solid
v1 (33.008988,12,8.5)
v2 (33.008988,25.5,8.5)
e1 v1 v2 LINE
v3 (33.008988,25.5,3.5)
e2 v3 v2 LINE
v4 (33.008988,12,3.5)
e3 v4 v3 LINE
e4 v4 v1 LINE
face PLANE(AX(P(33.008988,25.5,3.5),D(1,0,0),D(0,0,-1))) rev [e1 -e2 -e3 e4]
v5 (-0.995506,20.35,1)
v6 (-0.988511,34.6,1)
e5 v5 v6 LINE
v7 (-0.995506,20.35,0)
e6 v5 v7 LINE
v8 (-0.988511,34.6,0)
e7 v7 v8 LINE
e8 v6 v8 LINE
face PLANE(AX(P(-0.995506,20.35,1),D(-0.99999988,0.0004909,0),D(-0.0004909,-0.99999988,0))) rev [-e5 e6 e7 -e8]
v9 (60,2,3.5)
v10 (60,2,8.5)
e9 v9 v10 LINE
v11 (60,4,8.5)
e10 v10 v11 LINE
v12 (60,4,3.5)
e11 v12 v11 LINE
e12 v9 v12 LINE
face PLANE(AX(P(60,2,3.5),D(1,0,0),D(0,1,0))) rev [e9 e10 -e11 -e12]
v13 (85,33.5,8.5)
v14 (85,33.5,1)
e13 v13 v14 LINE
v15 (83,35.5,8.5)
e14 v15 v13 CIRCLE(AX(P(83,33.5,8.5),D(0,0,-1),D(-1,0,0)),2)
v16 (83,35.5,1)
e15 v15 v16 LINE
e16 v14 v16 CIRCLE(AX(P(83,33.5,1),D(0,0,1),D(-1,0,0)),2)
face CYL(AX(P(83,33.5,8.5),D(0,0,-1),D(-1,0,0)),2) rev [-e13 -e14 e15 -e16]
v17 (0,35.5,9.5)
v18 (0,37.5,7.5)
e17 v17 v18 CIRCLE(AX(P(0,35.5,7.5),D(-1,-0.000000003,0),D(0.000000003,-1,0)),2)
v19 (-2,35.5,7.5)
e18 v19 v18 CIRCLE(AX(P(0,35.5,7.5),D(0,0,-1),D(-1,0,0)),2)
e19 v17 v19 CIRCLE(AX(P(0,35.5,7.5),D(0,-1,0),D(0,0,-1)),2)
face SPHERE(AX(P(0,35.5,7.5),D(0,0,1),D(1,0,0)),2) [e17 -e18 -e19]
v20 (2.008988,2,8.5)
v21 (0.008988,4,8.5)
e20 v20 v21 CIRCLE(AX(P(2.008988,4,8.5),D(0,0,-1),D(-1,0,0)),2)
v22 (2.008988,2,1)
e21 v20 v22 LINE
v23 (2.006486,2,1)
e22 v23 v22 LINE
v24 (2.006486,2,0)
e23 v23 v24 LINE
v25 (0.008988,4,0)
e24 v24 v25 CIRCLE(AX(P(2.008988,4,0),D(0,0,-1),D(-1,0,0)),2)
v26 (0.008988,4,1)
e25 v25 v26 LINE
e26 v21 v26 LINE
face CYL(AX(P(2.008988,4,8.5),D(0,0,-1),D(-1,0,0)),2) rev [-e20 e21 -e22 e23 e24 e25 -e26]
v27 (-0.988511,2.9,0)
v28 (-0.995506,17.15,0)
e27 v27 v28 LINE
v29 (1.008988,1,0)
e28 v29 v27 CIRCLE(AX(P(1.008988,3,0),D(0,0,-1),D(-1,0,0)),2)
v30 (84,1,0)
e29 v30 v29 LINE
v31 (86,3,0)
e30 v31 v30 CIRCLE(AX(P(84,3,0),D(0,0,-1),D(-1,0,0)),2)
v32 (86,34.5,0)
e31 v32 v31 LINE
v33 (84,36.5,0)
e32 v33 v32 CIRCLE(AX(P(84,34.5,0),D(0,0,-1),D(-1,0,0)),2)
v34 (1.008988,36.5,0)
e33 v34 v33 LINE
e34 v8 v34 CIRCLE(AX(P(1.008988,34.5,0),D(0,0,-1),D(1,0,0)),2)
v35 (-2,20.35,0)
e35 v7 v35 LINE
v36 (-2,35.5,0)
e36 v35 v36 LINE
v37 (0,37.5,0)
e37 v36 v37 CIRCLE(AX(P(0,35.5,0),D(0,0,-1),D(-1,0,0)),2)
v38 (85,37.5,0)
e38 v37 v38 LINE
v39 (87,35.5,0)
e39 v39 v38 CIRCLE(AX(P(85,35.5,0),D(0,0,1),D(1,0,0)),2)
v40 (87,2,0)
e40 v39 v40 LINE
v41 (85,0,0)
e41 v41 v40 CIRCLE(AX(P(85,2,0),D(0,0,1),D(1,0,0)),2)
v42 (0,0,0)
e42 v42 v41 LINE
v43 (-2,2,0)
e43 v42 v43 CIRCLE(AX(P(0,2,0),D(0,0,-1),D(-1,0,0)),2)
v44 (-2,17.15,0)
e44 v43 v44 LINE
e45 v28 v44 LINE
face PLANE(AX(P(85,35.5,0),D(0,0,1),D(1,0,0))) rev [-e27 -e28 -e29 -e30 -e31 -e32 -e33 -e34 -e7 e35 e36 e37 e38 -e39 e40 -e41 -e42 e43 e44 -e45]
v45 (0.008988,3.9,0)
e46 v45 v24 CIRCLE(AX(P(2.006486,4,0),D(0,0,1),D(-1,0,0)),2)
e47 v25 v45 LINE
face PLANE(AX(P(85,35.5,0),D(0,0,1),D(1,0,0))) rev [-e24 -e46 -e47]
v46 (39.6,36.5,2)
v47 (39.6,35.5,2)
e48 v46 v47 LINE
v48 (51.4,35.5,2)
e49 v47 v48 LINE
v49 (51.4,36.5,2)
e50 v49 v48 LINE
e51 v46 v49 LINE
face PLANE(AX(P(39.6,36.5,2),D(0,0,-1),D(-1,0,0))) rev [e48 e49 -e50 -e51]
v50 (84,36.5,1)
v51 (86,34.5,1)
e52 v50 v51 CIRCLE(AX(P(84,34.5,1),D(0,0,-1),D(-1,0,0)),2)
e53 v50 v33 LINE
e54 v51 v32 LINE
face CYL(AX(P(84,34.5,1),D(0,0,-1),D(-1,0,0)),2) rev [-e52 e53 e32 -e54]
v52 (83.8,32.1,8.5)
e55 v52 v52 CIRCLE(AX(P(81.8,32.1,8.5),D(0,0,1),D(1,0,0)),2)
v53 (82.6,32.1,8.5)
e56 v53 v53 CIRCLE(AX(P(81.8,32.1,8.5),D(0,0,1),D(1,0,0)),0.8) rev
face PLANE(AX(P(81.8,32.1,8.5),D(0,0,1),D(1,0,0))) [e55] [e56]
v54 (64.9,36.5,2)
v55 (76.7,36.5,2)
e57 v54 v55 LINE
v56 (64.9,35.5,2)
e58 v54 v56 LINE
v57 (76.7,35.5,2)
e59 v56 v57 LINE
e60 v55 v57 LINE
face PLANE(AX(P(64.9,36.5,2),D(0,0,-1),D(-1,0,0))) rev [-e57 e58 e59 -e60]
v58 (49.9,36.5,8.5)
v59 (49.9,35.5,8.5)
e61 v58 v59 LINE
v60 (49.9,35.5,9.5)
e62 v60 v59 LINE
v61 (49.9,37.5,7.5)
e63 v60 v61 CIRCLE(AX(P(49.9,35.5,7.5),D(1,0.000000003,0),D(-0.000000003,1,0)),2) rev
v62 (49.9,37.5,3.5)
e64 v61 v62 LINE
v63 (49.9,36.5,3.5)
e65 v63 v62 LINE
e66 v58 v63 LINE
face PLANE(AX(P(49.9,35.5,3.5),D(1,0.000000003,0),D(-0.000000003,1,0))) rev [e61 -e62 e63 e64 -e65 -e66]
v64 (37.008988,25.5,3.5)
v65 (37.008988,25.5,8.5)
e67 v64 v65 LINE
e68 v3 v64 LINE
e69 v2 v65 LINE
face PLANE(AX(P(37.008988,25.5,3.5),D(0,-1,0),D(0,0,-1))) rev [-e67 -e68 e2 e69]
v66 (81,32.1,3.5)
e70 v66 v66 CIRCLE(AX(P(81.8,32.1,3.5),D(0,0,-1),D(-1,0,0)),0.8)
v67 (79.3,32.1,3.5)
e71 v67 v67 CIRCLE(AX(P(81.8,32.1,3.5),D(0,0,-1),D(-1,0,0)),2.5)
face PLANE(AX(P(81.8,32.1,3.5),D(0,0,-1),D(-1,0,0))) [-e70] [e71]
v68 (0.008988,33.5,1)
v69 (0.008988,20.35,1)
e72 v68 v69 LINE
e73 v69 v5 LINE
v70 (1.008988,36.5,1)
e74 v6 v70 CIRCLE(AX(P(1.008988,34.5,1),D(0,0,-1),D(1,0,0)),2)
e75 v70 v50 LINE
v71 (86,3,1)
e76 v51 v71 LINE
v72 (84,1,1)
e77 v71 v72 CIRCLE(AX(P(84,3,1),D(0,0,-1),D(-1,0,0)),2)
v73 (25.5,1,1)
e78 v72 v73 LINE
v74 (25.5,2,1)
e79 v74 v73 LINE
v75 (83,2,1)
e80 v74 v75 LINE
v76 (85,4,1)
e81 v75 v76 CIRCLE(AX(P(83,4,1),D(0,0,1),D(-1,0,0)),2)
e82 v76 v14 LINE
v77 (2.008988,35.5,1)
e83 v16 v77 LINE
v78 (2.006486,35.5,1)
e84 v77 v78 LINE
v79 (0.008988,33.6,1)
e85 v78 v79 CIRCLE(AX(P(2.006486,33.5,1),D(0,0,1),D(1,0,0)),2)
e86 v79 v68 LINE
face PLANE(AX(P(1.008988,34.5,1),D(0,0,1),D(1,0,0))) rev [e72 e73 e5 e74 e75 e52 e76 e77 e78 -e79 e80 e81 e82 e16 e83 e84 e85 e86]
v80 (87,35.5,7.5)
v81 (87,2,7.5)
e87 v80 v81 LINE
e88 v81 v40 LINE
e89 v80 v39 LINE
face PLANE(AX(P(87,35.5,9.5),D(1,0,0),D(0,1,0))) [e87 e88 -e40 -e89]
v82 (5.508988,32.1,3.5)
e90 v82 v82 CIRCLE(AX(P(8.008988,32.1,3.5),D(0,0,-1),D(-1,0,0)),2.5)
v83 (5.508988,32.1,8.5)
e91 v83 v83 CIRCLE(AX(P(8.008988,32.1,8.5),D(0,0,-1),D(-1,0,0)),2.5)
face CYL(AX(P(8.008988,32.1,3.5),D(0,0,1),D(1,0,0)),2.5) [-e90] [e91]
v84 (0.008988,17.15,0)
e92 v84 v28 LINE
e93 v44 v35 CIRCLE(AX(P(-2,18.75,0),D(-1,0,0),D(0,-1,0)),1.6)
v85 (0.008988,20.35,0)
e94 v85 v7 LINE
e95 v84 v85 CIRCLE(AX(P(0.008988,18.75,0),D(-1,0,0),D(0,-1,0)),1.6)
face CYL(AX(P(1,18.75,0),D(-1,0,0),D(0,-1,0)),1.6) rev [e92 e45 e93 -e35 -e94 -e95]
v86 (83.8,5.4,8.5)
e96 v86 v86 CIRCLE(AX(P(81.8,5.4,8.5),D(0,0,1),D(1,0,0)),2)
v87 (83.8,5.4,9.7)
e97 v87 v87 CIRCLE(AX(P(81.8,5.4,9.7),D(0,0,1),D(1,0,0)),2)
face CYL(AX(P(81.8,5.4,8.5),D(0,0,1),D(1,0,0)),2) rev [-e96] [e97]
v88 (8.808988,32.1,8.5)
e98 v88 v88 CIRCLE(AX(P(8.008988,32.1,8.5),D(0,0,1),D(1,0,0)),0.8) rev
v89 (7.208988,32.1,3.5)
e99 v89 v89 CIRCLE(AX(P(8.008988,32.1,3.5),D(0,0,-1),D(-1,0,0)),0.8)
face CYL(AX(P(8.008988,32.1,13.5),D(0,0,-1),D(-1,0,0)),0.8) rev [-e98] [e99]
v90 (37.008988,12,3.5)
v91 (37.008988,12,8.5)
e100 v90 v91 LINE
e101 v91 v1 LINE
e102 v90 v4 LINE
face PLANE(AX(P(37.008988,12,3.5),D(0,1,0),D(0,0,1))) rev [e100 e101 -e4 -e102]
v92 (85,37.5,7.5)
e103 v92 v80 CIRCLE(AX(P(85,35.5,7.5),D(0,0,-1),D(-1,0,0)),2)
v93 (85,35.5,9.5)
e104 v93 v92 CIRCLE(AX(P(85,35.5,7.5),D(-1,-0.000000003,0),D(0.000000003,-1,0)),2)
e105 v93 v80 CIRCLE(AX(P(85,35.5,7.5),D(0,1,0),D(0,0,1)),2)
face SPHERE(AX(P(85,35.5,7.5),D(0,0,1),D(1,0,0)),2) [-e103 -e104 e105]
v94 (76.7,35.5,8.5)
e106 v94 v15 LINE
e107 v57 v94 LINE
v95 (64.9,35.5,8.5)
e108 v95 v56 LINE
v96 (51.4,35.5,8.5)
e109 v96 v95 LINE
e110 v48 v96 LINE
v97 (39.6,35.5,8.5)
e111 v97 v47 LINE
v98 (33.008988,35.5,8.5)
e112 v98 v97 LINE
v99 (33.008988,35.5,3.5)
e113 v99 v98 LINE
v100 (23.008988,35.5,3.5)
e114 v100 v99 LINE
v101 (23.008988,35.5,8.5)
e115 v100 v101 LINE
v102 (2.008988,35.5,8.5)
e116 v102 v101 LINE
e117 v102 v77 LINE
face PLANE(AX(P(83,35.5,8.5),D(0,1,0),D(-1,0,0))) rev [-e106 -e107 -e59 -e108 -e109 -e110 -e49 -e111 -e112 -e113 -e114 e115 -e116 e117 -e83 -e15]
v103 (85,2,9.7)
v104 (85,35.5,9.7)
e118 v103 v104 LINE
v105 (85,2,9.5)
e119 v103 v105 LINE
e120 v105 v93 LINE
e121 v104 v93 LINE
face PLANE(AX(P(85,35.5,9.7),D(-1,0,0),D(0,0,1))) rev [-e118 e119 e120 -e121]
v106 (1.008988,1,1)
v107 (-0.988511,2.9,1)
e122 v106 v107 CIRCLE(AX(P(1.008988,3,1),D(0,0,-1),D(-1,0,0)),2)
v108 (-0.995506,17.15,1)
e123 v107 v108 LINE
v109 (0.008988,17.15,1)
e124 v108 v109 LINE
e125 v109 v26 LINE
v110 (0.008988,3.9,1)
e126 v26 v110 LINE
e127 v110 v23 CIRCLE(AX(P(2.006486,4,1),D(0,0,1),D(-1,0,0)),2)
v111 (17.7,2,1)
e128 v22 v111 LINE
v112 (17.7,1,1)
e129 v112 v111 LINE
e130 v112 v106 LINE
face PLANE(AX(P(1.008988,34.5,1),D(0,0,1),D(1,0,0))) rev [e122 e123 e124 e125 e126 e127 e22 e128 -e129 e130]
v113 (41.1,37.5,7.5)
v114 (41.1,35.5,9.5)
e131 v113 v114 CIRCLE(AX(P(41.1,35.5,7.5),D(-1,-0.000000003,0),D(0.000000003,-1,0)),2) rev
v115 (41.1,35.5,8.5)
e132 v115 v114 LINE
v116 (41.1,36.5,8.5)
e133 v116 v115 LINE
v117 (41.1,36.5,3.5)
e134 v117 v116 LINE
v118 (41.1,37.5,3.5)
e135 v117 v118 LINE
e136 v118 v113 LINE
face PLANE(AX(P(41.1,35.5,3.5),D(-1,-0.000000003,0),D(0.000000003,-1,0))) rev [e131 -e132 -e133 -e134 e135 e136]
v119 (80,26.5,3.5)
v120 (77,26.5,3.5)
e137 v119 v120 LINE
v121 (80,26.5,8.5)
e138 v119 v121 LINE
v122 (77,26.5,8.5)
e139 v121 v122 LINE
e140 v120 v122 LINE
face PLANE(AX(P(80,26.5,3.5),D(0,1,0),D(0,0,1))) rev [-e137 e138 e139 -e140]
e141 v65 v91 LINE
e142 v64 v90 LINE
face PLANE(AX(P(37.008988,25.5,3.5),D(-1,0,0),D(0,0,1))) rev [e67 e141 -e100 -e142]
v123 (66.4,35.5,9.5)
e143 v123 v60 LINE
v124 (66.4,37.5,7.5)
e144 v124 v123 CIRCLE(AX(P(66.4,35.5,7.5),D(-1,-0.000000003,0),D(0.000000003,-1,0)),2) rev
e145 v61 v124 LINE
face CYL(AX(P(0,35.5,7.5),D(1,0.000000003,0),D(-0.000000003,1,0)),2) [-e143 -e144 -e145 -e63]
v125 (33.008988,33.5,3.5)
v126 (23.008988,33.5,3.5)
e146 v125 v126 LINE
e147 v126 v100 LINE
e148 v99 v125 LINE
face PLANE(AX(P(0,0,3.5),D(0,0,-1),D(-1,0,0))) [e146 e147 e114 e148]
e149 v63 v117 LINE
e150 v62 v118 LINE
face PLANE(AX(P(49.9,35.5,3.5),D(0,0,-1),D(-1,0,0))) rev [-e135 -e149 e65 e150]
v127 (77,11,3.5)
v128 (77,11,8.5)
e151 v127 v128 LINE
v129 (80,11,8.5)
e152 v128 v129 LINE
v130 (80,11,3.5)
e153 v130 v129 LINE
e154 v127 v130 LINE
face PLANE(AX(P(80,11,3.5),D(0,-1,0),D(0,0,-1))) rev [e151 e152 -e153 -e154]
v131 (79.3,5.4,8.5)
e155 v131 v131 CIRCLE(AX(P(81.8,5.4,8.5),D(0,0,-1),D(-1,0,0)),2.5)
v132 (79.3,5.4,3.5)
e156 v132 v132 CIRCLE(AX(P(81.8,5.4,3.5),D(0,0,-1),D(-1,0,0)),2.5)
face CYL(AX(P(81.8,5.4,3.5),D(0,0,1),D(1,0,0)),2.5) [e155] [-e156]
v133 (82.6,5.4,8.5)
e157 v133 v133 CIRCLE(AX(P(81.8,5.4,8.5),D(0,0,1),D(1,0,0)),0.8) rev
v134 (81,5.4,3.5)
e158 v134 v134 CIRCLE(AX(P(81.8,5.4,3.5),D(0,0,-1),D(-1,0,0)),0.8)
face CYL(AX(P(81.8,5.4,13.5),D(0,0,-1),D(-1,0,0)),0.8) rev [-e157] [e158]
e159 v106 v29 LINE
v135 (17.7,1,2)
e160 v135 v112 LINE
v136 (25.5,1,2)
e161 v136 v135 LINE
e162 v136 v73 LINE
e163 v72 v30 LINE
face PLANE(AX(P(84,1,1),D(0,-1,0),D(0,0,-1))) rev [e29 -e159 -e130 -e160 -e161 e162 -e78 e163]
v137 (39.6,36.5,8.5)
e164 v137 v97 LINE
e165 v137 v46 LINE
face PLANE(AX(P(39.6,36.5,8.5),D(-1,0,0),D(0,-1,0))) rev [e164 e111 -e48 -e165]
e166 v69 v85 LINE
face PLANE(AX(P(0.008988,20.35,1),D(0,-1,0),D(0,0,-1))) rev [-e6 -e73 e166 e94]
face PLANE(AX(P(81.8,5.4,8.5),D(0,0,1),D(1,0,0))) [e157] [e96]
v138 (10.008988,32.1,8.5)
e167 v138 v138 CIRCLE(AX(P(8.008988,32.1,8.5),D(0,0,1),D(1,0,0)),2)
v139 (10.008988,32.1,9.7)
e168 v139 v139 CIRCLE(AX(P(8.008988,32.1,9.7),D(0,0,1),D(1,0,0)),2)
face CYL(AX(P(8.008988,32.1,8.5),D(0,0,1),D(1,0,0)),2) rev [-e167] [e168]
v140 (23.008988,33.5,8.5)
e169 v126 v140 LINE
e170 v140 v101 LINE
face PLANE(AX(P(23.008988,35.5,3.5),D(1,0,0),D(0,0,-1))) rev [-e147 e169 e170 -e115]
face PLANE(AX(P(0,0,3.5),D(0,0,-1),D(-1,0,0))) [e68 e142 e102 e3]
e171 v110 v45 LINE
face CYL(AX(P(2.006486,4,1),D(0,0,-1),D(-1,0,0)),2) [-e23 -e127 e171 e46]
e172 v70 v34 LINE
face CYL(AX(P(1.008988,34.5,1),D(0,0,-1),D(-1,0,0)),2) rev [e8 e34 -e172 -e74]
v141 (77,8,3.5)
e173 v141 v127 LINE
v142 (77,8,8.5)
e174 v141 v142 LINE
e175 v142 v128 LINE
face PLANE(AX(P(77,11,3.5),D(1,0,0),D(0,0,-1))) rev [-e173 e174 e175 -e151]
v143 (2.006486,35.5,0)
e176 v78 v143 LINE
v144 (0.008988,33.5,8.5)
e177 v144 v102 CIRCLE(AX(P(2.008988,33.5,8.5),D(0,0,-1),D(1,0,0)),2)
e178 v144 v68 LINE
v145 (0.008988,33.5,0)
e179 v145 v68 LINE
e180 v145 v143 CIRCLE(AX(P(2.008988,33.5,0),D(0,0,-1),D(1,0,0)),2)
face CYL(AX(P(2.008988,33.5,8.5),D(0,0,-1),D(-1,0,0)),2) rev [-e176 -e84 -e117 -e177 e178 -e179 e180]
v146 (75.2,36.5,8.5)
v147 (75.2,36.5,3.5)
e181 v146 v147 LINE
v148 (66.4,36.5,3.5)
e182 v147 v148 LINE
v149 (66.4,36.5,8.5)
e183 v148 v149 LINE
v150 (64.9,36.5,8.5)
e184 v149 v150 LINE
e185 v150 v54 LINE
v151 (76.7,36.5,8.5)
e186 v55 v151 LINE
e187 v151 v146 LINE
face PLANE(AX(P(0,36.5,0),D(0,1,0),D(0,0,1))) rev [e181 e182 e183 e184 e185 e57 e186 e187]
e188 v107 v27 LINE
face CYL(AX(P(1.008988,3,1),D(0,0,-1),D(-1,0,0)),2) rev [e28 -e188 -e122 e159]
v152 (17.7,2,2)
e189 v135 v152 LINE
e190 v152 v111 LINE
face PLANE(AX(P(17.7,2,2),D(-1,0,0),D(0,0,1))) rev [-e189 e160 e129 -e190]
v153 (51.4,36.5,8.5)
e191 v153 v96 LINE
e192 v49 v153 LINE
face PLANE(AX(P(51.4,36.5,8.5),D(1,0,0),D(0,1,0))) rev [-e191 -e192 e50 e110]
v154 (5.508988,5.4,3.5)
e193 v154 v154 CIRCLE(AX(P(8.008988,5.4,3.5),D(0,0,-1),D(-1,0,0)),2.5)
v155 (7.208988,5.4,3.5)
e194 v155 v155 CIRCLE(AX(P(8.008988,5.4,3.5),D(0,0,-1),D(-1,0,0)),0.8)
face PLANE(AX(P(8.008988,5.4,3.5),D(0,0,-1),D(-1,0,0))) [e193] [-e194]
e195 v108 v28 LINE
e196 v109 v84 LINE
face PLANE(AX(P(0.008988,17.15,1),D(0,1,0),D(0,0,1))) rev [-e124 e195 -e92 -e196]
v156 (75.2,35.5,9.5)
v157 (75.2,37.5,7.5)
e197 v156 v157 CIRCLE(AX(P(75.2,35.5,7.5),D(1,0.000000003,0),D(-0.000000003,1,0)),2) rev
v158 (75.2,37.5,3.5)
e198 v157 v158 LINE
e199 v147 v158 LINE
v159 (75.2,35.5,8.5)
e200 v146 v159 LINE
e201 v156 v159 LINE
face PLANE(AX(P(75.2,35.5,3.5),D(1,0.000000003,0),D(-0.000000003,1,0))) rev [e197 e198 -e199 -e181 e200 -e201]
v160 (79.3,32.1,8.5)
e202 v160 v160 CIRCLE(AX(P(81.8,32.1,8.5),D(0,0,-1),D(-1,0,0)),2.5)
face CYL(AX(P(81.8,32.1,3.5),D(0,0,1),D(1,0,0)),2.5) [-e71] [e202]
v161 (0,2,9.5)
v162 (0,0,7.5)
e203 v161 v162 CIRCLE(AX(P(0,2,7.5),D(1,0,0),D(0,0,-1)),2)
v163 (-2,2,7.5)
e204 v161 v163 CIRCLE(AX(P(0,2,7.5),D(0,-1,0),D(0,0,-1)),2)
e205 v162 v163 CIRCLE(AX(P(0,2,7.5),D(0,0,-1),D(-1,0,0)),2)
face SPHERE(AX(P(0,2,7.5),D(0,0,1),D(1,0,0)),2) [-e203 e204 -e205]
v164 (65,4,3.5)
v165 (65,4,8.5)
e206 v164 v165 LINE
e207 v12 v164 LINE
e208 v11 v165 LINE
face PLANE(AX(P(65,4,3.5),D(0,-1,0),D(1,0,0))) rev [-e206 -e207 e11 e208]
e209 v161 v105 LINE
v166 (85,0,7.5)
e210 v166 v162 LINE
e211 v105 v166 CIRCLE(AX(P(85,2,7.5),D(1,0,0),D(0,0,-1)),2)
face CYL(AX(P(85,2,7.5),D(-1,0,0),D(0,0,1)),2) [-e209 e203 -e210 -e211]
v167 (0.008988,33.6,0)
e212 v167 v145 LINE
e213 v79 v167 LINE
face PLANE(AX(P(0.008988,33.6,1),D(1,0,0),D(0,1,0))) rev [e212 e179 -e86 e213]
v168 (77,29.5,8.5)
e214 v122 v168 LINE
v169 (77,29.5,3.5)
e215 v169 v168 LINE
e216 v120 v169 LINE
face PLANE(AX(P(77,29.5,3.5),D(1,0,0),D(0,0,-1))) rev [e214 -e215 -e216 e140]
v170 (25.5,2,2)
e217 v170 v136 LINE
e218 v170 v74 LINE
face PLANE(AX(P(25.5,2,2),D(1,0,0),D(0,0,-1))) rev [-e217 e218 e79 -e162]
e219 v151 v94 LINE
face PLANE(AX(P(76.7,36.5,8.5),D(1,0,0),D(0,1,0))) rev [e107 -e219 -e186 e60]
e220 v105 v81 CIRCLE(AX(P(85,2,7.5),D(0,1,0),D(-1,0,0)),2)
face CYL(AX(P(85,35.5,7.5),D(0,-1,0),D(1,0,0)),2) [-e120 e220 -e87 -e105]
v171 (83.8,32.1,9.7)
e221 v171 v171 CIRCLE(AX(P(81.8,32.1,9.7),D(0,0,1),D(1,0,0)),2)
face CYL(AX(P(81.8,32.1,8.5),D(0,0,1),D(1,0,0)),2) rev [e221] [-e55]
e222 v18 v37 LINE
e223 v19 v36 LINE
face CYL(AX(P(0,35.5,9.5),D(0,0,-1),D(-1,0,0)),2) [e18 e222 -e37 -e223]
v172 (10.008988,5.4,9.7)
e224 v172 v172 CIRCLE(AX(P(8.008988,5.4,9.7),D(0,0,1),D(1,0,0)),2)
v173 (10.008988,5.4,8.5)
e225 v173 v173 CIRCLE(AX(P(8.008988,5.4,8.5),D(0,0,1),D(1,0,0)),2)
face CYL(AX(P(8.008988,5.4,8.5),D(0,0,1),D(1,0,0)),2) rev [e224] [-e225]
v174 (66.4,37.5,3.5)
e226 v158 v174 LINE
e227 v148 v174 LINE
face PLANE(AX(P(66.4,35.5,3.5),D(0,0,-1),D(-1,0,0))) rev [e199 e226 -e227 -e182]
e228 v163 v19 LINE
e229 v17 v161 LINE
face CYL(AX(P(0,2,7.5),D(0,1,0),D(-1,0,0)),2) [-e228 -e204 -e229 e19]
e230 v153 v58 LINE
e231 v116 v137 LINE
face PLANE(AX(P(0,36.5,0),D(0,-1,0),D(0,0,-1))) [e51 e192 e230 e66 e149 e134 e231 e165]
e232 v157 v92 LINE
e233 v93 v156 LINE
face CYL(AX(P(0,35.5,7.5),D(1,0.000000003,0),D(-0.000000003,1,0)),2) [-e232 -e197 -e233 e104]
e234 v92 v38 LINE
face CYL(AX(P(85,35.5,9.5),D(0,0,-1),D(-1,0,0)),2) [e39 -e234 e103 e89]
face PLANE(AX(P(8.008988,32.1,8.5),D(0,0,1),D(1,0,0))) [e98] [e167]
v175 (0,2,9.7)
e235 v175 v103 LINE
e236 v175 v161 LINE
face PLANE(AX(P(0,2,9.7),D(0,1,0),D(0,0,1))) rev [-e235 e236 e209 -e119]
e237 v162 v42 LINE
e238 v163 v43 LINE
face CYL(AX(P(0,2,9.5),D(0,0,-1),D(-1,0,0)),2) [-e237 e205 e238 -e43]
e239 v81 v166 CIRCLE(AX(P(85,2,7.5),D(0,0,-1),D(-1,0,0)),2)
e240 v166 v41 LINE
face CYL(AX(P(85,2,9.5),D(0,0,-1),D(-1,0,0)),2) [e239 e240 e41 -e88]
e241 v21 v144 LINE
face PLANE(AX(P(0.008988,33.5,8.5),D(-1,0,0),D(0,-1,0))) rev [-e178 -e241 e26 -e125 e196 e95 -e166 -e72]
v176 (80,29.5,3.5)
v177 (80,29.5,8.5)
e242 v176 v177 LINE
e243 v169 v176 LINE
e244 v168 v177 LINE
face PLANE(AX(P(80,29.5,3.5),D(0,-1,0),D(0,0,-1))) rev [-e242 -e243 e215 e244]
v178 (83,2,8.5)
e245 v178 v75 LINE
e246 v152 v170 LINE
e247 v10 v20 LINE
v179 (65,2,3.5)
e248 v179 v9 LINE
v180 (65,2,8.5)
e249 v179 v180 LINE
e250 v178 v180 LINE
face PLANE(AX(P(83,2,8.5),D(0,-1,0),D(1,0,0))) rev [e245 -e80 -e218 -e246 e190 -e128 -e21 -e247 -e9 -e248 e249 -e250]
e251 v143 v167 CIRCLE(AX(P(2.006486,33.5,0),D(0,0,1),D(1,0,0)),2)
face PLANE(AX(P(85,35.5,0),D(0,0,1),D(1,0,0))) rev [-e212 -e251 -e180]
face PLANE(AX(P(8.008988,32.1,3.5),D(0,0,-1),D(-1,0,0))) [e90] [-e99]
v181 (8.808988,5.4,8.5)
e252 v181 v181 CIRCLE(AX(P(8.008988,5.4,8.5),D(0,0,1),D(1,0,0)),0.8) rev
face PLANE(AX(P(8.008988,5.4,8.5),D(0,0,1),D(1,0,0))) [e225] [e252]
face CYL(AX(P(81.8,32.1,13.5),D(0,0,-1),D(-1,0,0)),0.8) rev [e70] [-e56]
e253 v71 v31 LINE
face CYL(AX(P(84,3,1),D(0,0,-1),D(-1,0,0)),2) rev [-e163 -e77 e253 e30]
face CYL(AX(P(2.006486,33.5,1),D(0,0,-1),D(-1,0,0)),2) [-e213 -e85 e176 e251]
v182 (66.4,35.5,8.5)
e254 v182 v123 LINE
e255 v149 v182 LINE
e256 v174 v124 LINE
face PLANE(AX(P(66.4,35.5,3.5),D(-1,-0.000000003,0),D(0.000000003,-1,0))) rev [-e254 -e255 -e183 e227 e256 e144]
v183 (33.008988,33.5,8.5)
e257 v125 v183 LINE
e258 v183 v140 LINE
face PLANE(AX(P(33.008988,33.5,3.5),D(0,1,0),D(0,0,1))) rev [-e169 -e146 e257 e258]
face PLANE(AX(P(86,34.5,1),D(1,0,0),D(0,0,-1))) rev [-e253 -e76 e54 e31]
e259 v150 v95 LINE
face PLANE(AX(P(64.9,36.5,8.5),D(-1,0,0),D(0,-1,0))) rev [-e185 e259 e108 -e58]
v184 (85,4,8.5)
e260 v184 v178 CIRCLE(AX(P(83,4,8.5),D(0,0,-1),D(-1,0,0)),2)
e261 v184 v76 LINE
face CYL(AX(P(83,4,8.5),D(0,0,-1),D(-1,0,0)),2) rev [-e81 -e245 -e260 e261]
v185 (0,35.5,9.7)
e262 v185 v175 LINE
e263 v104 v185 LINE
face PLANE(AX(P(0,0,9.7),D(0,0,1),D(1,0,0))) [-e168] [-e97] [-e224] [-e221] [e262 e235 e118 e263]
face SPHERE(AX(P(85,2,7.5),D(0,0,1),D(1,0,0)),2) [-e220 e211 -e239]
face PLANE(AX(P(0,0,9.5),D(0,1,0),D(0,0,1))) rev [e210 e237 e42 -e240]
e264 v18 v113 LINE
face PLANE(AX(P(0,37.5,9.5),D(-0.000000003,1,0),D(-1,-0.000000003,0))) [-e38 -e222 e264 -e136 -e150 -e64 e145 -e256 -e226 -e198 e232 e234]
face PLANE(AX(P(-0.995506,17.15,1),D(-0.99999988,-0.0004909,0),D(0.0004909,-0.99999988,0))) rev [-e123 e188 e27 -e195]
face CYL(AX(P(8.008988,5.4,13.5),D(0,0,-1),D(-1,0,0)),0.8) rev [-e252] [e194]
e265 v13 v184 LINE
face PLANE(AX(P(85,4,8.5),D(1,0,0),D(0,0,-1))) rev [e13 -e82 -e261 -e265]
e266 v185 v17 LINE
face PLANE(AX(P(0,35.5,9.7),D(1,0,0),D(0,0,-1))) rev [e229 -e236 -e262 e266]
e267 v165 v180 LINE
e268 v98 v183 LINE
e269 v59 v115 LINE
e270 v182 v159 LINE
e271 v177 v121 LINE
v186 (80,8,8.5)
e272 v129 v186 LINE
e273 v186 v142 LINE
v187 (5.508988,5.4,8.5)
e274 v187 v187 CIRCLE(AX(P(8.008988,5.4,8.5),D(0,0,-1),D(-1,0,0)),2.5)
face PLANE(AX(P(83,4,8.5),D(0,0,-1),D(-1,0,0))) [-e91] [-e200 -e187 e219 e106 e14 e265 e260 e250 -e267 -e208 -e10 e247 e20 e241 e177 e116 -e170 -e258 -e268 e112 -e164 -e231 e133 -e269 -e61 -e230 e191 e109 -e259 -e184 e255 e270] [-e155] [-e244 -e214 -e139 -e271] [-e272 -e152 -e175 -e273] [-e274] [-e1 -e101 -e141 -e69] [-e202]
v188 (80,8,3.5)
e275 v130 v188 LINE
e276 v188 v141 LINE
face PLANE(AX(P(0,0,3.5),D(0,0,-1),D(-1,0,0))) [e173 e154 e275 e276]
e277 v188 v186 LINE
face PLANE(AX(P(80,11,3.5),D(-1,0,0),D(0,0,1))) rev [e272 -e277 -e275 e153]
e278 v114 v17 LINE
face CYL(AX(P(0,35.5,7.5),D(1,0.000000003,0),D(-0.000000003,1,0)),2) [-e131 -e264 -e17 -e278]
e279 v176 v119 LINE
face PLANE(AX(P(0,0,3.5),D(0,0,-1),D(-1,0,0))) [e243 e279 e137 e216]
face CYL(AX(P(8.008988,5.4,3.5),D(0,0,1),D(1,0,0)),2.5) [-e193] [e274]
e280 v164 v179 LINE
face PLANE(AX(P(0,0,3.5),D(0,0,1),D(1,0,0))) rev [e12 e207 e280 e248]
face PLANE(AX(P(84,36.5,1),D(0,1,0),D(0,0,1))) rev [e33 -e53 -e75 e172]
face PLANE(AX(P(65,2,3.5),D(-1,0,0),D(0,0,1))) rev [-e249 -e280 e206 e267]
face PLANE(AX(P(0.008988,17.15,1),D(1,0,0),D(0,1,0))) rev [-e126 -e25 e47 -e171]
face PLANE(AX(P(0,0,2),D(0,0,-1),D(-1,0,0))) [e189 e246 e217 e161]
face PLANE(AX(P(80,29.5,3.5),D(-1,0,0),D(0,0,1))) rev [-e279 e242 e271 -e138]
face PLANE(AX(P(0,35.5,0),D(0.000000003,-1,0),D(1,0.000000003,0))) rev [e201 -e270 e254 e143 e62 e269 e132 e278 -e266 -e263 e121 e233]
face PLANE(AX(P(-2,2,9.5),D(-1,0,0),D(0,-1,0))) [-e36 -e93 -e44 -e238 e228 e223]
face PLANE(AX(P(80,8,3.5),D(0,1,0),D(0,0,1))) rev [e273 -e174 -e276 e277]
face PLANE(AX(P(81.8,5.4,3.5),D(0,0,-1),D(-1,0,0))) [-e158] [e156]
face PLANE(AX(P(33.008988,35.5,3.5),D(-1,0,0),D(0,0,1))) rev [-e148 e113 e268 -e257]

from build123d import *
from OCP.BRepAlgoAPI import BRepAlgoAPI_Cut
from OCP.TopTools import TopTools_ListOfShape

# Parameters (mm, degrees)
EXTRUDE_1_DEPTH      = 9.5
CUT_EXTRUDE_1_DEPTH  = 8.5
SKETCH_4_R           = 2.5
SKETCH_4_W           = 10
SKETCH_4_H           = 2
SKETCH_4_W_2         = 5
EXTRUDE_2_DEPTH      = 5
SKETCH_10_W          = 8.8
SKETCH_10_H          = 6
CUT_EXTRUDE_3_DEPTH  = 2
CUT_EXTRUDE_4_DEPTH  = 3
FILLET_4_R           = 2
FILLET_5_R           = 2
SKETCH_5_R           = 0.8
CUT_EXTRUDE_5_DEPTH  = 10
SKETCH_7_R           = 0.8
CUT_EXTRUDE_6_DEPTH  = 10
SKETCH_6_R           = 0.8
CUT_EXTRUDE_7_DEPTH  = 10
SKETCH_8_R           = 0.8
CUT_EXTRUDE_8_DEPTH  = 10
SKETCH_12_R          = 2
CUT_EXTRUDE_9_DEPTH  = 1
SKETCH_14_W          = 1.5
SKETCH_14_H          = 5
CUT_EXTRUDE_11_DEPTH = 1
SKETCH_15_W          = 1.5
SKETCH_15_H          = 5
CUT_EXTRUDE_12_DEPTH = 1
SKETCH_16_W          = 1.5
SKETCH_16_H          = 5
CUT_EXTRUDE_13_DEPTH = 1
SKETCH_18_W          = 3
SKETCH_18_H          = 3
SKETCH_18_W_2        = 4
SKETCH_18_H_2        = 13.499999703
EXTRUDE_3_DEPTH      = 5
SKETCH_20_W          = 11.8
SKETCH_20_H          = 1.5
CUT_EXTRUDE_16_DEPTH = 1
EXTRUDE_START        = 0.2
SKETCH_21_W          = 85
SKETCH_21_H          = 33.499999703
SKETCH_21_R          = 2
EXTRUDE_4_DEPTH      = 0.2
CUT_EXTRUDE_17_DEPTH = 1
SKETCH_22_W          = 7.8
SKETCH_22_H          = 1
CUT_EXTRUDE_18_DEPTH = 1


with BuildPart() as part:
    # 草图2 → 凸台-拉伸1 (new body)
    with BuildSketch(Plane.XY):
        with BuildLine():
            Line((0, 0), (85, 0))
            ThreePointArc((85, 0), (86.414213562, 0.585786438), (87, 2))
            Line((87, 2), (87, 35.5))
            ThreePointArc((87, 35.5), (86.41421356, 36.914213565), (84.999999993, 37.5))
            Line((84.999999993, 37.5), (-7e-09, 37.499999703))
            ThreePointArc((-7e-09, 37.499999703), (-1.414213565, 36.914213263), (-2, 35.499999703))
            Line((-2, 35.499999703), (-2, 1.999999703))
            ThreePointArc((-2, 1.999999703), (-1.414213353, 0.585786351), (0, 0))
        make_face()
    extrude(amount=EXTRUDE_1_DEPTH)

    # 草图3 → 切除-拉伸1 (cut)
    with BuildSketch(Plane(origin=(0, 0, 0), x_dir=(-1, 0, 0), z_dir=(0, 0, -1))):
        with BuildLine():
            Line((-83, 2), (-2.008987521, 2))
            ThreePointArc((-2.008987521, 2), (-0.594773959, 2.585786438), (-0.008987521, 4))
            Line((-0.008987521, 4), (-0.008987521, 33.499999703))
            ThreePointArc((-0.008987521, 33.499999703), (-0.594773959, 34.914213266), (-2.008987521, 35.499999703))
            Line((-2.008987521, 35.499999703), (-83, 35.499999703))
            ThreePointArc((-83, 35.499999703), (-84.414213562, 34.914213266), (-85, 33.499999703))
            Line((-85, 33.499999703), (-85, 4))
            ThreePointArc((-85, 4), (-84.414213562, 2.585786438), (-83, 2))
        make_face()
    extrude(amount=-CUT_EXTRUDE_1_DEPTH, mode=Mode.SUBTRACT)

    # 草图4 → 凸台-拉伸2 (add)
    with BuildSketch(Plane(origin=(0, 0, 8.5), x_dir=(-1, 0, 0), z_dir=(0, 0, -1))):
        with Locations((-81.8, 32.099999703)):
            Circle(SKETCH_4_R)
        with Locations((-8.008987521, 32.099999703)):
            Circle(SKETCH_4_R)
        with Locations((-8.008987521, 5.4)):
            Circle(SKETCH_4_R)
        with Locations((-81.8, 5.4)):
            Circle(SKETCH_4_R)
        with Locations((-28.008987521, 34.499999703)):
            Rectangle(SKETCH_4_W, SKETCH_4_H)
        with Locations((-62.5, 3)):
            Rectangle(SKETCH_4_W_2, SKETCH_4_H)
    extrude(amount=EXTRUDE_2_DEPTH)

    # 草图10 → 切除-拉伸3 (cut)
    with BuildSketch(Plane(origin=(-1.31e-07, 37.499999703, 0), x_dir=(1.0, 3.4902577560140295e-09, 0), z_dir=(-3.4902577560140295e-09, 1.0, 0))):
        with Locations((45.500000124, -6.5)):
            Rectangle(SKETCH_10_W, SKETCH_10_H)
        with Locations((70.800000124, -6.5)):
            Rectangle(SKETCH_10_W, SKETCH_10_H)
    extrude(amount=-CUT_EXTRUDE_3_DEPTH, mode=Mode.SUBTRACT)

    # 草图11 → 切除-拉伸4 (cut)
    with BuildSketch(Plane.ZY.offset(2)):
        with BuildLine():
            Line((0, 20.349999703), (0, 17.149999703))
            ThreePointArc((0, 17.149999703), (1.6, 18.749999703), (0, 20.349999703))
        make_face()
    extrude(amount=-CUT_EXTRUDE_4_DEPTH, mode=Mode.SUBTRACT)

    # 圆角4
    fillet_4_edges = [part.edges().sort_by_distance(p)[0] for p in [
        (80.099999993, 37.499999983, 9.5),
        (86.41421356, 36.914213565, 9.5),
        (87, 18.75, 9.5),
        (86.414213562, 0.585786438, 9.5),
        (42.5, 0, 9.5),
        (-1.414213396, 0.585786394, 9.5),
        (-2, 18.749999703, 9.5),
        (-1.414213565, 36.914213263, 9.5),
        (20.549999993, 37.499999775, 9.5),
    ]]
    fillet(fillet_4_edges, radius=FILLET_4_R - 0.0001)  # a hair under: the kernel refuses the full size

    # 圆角5
    fillet_5_edges = [part.edges().sort_by_distance(p)[0] for p in [
        (58.149999993, 37.499999906, 9.5),
    ]]
    fillet(fillet_5_edges, radius=FILLET_5_R)

    # 草图5 → 切除-拉伸5 (cut)
    with BuildSketch(Plane(origin=(0, 0, 3.5), x_dir=(-1, 0, 0), z_dir=(0, 0, -1))):
        with Locations((-81.8, 32.099999703)):
            Circle(SKETCH_5_R)
    extrude(amount=-CUT_EXTRUDE_5_DEPTH, mode=Mode.SUBTRACT)

    # 草图7 → 切除-拉伸6 (cut)
    with BuildSketch(Plane(origin=(0, 0, 3.5), x_dir=(-1, 0, 0), z_dir=(0, 0, -1))):
        with Locations((-8.008987521, 5.4)):
            Circle(SKETCH_7_R)
    extrude(amount=-CUT_EXTRUDE_6_DEPTH, mode=Mode.SUBTRACT)

    # 草图6 → 切除-拉伸7 (cut)
    with BuildSketch(Plane(origin=(0, 0, 3.5), x_dir=(-1, 0, 0), z_dir=(0, 0, -1))):
        with Locations((-8.008987521, 32.099999703)):
            Circle(SKETCH_6_R)
    extrude(amount=-CUT_EXTRUDE_7_DEPTH, mode=Mode.SUBTRACT)

    # 草图8 → 切除-拉伸8 (cut)
    with BuildSketch(Plane(origin=(0, 0, 3.5), x_dir=(-1, 0, 0), z_dir=(0, 0, -1))):
        with Locations((-81.8, 5.4)):
            Circle(SKETCH_8_R)
    extrude(amount=-CUT_EXTRUDE_8_DEPTH, mode=Mode.SUBTRACT)

    # 草图12 → 切除-拉伸9 (cut)
    with BuildSketch(Plane.XY.offset(9.5)):
        with Locations((8.008987521, 32.099999703)):
            Circle(SKETCH_12_R)
        with Locations((81.8, 32.099999703)):
            Circle(SKETCH_12_R)
        with Locations((81.8, 5.4)):
            Circle(SKETCH_12_R)
        with Locations((8.008987521, 5.4)):
            Circle(SKETCH_12_R)
    extrude(amount=-CUT_EXTRUDE_9_DEPTH, mode=Mode.SUBTRACT)

    # 草图14 → 切除-拉伸11 (cut)
    with BuildSketch(Plane.XZ.offset(-35.499999703)):
        with Locations((50.65, 6)):
            Rectangle(SKETCH_14_W, SKETCH_14_H)
        with Locations((65.65, 6)):
            Rectangle(SKETCH_14_W, SKETCH_14_H)
    extrude(amount=-CUT_EXTRUDE_11_DEPTH, mode=Mode.SUBTRACT)

    # 草图15 → 切除-拉伸12 (cut)
    with BuildSketch(Plane.XZ.offset(-35.499999703)):
        with Locations((75.95, 6)):
            Rectangle(SKETCH_15_W, SKETCH_15_H)
    extrude(amount=-CUT_EXTRUDE_12_DEPTH, mode=Mode.SUBTRACT)

    # 草图16 → 切除-拉伸13 (cut)
    with BuildSketch(Plane.XZ.offset(-35.499999703)):
        with Locations((40.35, 6)):
            Rectangle(SKETCH_16_W, SKETCH_16_H)
    extrude(amount=-CUT_EXTRUDE_13_DEPTH, mode=Mode.SUBTRACT)

    # 草图18 → 凸台-拉伸3 (add)
    with BuildSketch(Plane(origin=(0, 0, 8.5), x_dir=(-1, 0, 0), z_dir=(0, 0, -1))):
        with Locations((-78.5, 9.5)):
            Rectangle(SKETCH_18_W, SKETCH_18_H)
        with Locations((-78.5, 27.999999703)):
            Rectangle(SKETCH_18_W, SKETCH_18_H)
        with Locations((-35.008987521, 18.749999852)):
            Rectangle(SKETCH_18_W_2, SKETCH_18_H_2)
    extrude(amount=EXTRUDE_3_DEPTH)

    # 草图20 → 切除-拉伸16 (cut)
    with BuildSketch(Plane.XZ.offset(-35.499999703)):
        with Locations((45.5, 2.75)):
            Rectangle(SKETCH_20_W, SKETCH_20_H)
        with Locations((70.8, 2.75)):
            Rectangle(SKETCH_20_W, SKETCH_20_H)
    extrude(amount=-CUT_EXTRUDE_16_DEPTH, mode=Mode.SUBTRACT)

    # 草图21 → 凸台-拉伸4 (add)
    with BuildSketch(Plane.XY.offset(9.5).offset(EXTRUDE_START)):
        with Locations((42.5, 18.749999852)):
            Rectangle(SKETCH_21_W, SKETCH_21_H)
        with Locations((8.008987521, 32.099999703)):
            Circle(SKETCH_21_R, mode=Mode.SUBTRACT)
        with Locations((8.008987521, 5.4)):
            Circle(SKETCH_21_R, mode=Mode.SUBTRACT)
        with Locations((81.8, 32.099999703)):
            Circle(SKETCH_21_R, mode=Mode.SUBTRACT)
        with Locations((81.8, 5.4)):
            Circle(SKETCH_21_R, mode=Mode.SUBTRACT)
    extrude(amount=-EXTRUDE_4_DEPTH)


with BuildPart() as cut_extrude_17_tool:
    # 草图19 → 切除-拉伸17 (new body)
    with BuildSketch(Plane(origin=(0, 0, 0), x_dir=(-1, 0, 0), z_dir=(0, 0, -1))):
        with BuildLine():
            Line((-84, 36.499999703), (-1.008987521, 36.499999703))
            ThreePointArc((-1.008987521, 36.499999703), (0.369417354, 35.949137378), (0.988510914, 34.599999703))
            Line((0.988510914, 34.599999703), (0.995506239, 20.349999703))
            Line((0.995506239, 20.349999703), (-0.008987521, 20.349999703))
            Line((-0.008987521, 20.349999703), (-0.008987521, 33.599999703))
            ThreePointArc((-0.008987521, 33.599999703), (-0.628081081, 34.949137378), (-2.006485957, 35.499999703))
            Line((-2.006485957, 35.499999703), (-83, 35.499999703))
            ThreePointArc((-83, 35.499999703), (-84.414213562, 34.914213266), (-85, 33.499999703))
            Line((-85, 33.499999703), (-85, 4))
            ThreePointArc((-85, 4), (-84.414213562, 2.585786438), (-83, 2))
            Line((-83, 2), (-2.006485957, 2))
            ThreePointArc((-2.006485957, 2), (-0.628081081, 2.550862325), (-0.008987521, 3.9))
            Line((-0.008987521, 3.9), (-0.008987521, 17.149999703))
            Line((-0.008987521, 17.149999703), (0.995506239, 17.149999703))
            Line((0.995506239, 17.149999703), (0.988510914, 2.9))
            ThreePointArc((0.988510914, 2.9), (0.369417354, 1.550862325), (-1.008987521, 1))
            Line((-1.008987521, 1), (-84, 1))
            ThreePointArc((-84, 1), (-85.414213562, 1.585786438), (-86, 3))
            Line((-86, 3), (-86, 34.499999703))
            ThreePointArc((-86, 34.499999703), (-85.414213562, 35.914213266), (-84, 36.499999703))
        make_face()
    extrude(amount=-CUT_EXTRUDE_17_DEPTH)


with BuildPart() as part_1:
    add(part.part)

    # 切除-拉伸17: cut by cut_extrude_17_tool, with a tolerance
    cut_extrude_17_stock = TopTools_ListOfShape()
    cut_extrude_17_stock.Append(part_1.part.wrapped)
    cut_extrude_17_tools = TopTools_ListOfShape()
    cut_extrude_17_tools.Append(cut_extrude_17_tool.part.wrapped)
    cut_extrude_17_cut = BRepAlgoAPI_Cut()
    cut_extrude_17_cut.SetArguments(cut_extrude_17_stock)
    cut_extrude_17_cut.SetTools(cut_extrude_17_tools)
    cut_extrude_17_cut.SetFuzzyValue(0.00001)
    cut_extrude_17_cut.Build()
    add(Compound.cast(cut_extrude_17_cut.Shape()).solids(), mode=Mode.REPLACE)

    # 草图22 → 切除-拉伸18 (cut)
    with BuildSketch(Plane(origin=(0, 0, 1), x_dir=(-1, 0, 0), z_dir=(0, 0, -1))):
        with Locations((-21.6, 1.5)):
            Rectangle(SKETCH_22_W, SKETCH_22_H)
    extrude(amount=-CUT_EXTRUDE_18_DEPTH, mode=Mode.SUBTRACT)


solid = part_1.part
